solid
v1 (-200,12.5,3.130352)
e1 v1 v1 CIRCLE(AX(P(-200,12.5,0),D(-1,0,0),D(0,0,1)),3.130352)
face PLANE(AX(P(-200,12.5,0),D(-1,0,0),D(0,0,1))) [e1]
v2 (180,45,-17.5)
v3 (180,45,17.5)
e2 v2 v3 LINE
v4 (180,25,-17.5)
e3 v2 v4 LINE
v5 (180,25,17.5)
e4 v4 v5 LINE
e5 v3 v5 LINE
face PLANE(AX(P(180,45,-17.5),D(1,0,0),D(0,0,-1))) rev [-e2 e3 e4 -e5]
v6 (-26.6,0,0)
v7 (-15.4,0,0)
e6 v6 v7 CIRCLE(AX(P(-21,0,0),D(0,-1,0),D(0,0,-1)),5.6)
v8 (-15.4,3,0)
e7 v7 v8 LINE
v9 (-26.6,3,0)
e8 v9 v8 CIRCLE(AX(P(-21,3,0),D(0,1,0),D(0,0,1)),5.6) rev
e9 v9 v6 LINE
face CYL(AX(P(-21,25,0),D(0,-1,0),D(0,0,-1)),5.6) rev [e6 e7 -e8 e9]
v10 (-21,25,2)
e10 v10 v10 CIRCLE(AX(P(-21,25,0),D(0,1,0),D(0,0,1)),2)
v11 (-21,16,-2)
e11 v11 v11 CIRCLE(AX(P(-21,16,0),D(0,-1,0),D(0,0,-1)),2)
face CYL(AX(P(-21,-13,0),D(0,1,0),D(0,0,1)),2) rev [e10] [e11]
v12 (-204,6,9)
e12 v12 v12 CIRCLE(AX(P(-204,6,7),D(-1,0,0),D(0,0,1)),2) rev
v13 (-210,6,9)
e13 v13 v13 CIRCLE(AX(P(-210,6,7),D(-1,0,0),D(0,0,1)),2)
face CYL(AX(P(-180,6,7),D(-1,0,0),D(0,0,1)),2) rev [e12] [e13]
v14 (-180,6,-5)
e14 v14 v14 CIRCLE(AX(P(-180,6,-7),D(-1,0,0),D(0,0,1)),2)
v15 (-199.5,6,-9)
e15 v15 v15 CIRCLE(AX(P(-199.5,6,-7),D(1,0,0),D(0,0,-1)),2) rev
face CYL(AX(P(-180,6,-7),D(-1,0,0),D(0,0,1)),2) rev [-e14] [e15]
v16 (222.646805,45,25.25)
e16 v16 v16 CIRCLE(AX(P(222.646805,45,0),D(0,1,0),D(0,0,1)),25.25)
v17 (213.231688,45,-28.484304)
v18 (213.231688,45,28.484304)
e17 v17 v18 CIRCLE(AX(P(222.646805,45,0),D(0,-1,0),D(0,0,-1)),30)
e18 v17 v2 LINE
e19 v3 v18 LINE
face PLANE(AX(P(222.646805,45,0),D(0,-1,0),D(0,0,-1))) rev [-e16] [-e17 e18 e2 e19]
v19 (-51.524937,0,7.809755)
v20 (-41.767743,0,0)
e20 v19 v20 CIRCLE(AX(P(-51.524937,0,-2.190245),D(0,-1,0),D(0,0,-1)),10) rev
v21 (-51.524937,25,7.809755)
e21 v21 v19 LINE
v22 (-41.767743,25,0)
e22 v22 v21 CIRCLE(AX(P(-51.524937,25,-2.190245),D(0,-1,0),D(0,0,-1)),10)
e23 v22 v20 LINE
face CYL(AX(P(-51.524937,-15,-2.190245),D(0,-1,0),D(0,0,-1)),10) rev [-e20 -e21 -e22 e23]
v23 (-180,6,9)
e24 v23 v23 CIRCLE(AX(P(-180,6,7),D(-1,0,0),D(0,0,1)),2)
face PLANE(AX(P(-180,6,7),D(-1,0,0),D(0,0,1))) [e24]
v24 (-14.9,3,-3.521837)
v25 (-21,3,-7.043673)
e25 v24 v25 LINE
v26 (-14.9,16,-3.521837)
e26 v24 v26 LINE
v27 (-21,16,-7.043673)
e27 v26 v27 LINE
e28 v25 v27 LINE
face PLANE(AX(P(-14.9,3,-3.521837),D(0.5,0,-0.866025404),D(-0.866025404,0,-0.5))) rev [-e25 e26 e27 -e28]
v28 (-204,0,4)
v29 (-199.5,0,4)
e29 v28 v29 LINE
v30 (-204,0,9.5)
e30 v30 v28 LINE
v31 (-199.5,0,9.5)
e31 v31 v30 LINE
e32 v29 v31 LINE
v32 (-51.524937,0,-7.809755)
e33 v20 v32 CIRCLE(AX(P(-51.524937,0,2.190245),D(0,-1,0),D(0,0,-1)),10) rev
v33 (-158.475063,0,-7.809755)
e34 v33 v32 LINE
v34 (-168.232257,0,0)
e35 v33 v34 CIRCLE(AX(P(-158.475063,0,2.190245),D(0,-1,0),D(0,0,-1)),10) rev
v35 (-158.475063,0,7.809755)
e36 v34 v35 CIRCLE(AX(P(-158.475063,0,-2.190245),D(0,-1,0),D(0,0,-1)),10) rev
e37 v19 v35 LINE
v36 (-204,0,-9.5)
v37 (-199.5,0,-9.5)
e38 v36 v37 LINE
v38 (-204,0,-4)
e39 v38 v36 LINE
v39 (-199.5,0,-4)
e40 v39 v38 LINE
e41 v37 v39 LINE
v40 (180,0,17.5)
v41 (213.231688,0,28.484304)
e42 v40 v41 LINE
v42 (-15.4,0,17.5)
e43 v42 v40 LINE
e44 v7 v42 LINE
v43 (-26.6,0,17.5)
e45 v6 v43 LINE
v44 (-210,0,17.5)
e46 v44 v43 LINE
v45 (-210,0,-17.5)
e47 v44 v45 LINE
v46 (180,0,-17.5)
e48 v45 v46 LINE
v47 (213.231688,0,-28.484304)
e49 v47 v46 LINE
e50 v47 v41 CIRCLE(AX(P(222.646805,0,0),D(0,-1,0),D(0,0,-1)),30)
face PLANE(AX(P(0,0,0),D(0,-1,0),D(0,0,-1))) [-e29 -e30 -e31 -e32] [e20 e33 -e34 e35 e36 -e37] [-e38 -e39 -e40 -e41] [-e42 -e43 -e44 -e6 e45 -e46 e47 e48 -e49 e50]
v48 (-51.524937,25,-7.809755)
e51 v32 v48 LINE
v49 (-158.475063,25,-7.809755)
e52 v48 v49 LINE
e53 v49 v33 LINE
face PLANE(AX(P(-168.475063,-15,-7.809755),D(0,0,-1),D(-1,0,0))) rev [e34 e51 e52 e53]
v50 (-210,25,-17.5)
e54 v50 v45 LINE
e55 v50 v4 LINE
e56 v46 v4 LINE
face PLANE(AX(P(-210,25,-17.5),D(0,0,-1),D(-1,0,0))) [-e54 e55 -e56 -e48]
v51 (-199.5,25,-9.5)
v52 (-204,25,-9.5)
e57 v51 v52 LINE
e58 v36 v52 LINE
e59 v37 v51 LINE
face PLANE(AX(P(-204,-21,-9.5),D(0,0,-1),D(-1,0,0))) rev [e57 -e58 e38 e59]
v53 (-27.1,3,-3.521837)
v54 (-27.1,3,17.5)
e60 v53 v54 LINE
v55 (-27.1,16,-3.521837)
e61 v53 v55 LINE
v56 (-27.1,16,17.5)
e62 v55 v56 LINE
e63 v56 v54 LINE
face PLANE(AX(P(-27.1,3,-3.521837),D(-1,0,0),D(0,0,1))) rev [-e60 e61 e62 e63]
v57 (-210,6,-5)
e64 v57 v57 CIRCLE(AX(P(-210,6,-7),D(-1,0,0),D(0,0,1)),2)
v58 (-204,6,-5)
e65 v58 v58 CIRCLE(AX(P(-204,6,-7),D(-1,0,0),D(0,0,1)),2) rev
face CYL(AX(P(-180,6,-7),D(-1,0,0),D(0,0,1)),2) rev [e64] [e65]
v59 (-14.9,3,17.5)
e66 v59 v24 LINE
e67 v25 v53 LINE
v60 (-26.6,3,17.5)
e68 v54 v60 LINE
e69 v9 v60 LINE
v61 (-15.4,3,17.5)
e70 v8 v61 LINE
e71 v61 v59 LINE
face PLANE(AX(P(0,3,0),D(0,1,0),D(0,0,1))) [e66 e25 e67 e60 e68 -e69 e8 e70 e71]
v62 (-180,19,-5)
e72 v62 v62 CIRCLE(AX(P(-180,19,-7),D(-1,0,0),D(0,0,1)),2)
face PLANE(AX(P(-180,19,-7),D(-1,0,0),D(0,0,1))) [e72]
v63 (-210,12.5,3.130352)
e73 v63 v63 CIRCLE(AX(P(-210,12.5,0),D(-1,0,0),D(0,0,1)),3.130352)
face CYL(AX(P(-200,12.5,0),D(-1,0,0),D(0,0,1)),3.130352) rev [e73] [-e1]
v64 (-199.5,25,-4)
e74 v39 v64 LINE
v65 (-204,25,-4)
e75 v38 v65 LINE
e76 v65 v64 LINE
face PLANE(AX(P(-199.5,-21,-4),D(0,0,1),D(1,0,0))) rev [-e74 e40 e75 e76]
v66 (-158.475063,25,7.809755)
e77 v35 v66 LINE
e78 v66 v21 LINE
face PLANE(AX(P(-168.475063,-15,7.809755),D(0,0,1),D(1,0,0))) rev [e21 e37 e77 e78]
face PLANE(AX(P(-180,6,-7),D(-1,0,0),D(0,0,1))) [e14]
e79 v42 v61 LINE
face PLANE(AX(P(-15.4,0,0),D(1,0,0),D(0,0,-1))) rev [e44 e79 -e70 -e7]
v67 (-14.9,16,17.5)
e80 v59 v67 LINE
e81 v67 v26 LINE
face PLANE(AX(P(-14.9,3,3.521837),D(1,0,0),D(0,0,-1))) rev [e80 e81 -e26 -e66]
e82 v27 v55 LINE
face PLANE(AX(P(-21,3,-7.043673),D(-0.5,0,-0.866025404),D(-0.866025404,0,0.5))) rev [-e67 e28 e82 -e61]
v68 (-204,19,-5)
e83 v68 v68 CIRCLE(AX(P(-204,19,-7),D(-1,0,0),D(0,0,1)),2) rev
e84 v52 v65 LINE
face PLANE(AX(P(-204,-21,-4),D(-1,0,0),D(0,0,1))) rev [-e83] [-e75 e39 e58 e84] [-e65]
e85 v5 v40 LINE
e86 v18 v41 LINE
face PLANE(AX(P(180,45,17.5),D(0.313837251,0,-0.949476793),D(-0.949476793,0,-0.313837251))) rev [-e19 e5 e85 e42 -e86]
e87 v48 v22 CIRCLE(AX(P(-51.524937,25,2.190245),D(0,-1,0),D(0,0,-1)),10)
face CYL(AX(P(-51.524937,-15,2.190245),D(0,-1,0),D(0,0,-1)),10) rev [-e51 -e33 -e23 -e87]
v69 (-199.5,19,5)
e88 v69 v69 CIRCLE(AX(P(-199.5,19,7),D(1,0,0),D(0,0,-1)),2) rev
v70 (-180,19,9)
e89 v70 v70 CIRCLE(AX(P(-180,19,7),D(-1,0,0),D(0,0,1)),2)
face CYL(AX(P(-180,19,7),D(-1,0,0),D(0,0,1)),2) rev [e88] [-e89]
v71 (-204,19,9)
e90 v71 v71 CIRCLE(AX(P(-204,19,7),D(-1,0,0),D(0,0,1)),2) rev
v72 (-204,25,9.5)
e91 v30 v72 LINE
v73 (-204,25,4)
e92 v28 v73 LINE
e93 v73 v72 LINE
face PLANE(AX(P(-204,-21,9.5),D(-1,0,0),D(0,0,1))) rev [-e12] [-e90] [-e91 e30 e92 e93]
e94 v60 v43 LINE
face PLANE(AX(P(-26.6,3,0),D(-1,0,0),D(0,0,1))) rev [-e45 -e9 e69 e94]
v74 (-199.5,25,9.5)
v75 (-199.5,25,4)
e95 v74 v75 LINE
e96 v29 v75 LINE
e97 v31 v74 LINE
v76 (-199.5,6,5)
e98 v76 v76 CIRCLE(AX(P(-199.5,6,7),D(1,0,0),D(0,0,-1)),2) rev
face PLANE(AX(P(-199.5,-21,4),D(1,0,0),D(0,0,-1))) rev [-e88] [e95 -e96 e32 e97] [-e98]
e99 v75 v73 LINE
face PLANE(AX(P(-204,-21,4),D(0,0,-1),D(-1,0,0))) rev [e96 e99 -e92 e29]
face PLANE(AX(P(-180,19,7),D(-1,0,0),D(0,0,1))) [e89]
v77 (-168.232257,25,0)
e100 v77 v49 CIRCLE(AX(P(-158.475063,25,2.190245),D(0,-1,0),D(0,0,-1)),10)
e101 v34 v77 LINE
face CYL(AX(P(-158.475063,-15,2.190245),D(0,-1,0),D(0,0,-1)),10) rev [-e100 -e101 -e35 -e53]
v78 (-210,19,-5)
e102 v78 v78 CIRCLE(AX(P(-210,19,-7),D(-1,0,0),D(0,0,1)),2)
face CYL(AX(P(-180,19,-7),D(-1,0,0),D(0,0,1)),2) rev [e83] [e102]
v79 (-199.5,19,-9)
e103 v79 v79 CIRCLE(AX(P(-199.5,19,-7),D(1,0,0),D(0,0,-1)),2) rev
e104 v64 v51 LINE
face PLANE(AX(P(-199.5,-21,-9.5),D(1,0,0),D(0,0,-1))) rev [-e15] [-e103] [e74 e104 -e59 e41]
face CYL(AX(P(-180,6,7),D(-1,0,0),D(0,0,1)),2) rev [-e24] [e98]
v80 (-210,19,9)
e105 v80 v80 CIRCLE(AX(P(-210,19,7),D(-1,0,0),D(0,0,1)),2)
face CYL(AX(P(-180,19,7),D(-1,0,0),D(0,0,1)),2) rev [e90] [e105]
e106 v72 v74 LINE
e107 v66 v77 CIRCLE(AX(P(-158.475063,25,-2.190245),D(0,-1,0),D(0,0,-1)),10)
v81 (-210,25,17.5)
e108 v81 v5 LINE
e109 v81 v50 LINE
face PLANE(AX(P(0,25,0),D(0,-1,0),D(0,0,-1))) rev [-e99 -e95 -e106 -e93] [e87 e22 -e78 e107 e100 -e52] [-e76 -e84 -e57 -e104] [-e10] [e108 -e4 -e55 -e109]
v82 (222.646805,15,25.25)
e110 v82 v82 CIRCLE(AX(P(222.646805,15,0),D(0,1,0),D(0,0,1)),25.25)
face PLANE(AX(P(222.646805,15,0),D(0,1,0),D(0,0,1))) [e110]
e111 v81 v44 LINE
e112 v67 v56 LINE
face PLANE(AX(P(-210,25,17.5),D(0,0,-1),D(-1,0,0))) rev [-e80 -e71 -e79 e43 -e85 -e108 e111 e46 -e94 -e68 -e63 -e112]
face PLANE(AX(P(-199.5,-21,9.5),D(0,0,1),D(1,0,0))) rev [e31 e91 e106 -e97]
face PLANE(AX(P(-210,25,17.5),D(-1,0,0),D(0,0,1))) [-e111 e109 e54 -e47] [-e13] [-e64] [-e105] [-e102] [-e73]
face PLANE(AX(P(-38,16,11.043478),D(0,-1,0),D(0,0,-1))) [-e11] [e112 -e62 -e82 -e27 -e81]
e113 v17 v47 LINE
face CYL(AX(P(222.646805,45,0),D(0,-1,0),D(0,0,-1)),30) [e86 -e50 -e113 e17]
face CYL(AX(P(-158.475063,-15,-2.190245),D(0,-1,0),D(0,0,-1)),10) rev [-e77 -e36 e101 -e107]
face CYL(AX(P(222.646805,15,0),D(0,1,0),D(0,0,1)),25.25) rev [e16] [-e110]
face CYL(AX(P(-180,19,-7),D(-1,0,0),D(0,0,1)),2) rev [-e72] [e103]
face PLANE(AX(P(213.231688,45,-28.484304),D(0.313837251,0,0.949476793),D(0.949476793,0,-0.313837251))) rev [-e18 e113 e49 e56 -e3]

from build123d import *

# Parameters (mm, degrees)
SKETCH2_W                = 210
SKETCH2_H                = 35
BOSS_EXTRUDE1_DEPTH      = 25
SKETCH3_R                = 5.6
CUT_EXTRUDE1_DEPTH       = 213.205678529
CUT_EXTRUDE2_DEPTH       = 22
SKETCH6_W                = 22.496439662
SKETCH6_H                = 9
BOSS_EXTRUDE3_DEPTH      = 38
CUT_EXTRUDE4_DEPTH       = 17.5
SKETCH9_R                = 2
CUT_EXTRUDE5_DEPTH       = 38
SKETCH10_R               = 2
CUT_EXTRUDE6_DEPTH       = 30
SKETCH12_W               = 4.5
SKETCH12_H               = 5.5
CUT_EXTRUDE7_DEPTH       = 46
SKETCH14_W               = 126.950126738
SKETCH14_H               = 15.619509634
CUT_EXTRUDE8_DEPTH       = 40
FILLET1_R                = 10
SKETCH17_W               = 35
SKETCH17_H               = 25
BOSS_EXTRUDE5_DEPTH      = 180
BOSS_EXTRUDE4_DEPTH      = 20
BOSS_EXTRUDE4_DEPTH_BACK = 25
SKETCH18_R               = 3.130352174
CUT_EXTRUDE9_DEPTH       = 10
SKETCH20_R               = 25.25
CUT_EXTRUDE11_DEPTH      = 30


with BuildPart() as part:
    # Sketch2 → Boss-Extrude1 (new body)
    with BuildSketch(Plane(origin=(0, 0, 0), x_dir=(1, 0, 0), z_dir=(0, 1, 0))):
        with Locations((-105, 0)):
            Rectangle(SKETCH2_W, SKETCH2_H)
    extrude(amount=BOSS_EXTRUDE1_DEPTH)

    # Sketch3 → Cut-Extrude1 (cut, through all)
    with BuildSketch(Plane.XZ):
        with Locations(Location((-21, 0, 0), (0, 0, 270))):
            Circle(SKETCH3_R)
    extrude(amount=-CUT_EXTRUDE1_DEPTH, mode=Mode.SUBTRACT)

    # Sketch4 → Cut-Extrude2 (cut)
    with BuildSketch(Plane(origin=(0, 25, 0), x_dir=(1, 0, 0), z_dir=(0, 1, 0))):
        Polygon((-14.9, 3.521836642), (-21, 7.043673284), (-27.1, 3.521836642), (-27.1, -3.521836642), (-21, -7.043673284), (-14.9, -3.521836642), align=None)
    extrude(amount=-CUT_EXTRUDE2_DEPTH, mode=Mode.SUBTRACT)

    # Sketch6 → Boss-Extrude3 (add)
    with BuildSketch(Plane(origin=(0, 0, 0), x_dir=(0, 0, -1), z_dir=(1, 0, 0))):
        with Locations((0.204742288, 20.5)):
            Rectangle(SKETCH6_W, SKETCH6_H)
    extrude(amount=-BOSS_EXTRUDE3_DEPTH)

    # Sketch7 → Cut-Extrude4 (cut)
    with BuildSketch(Plane.XY.offset(17.5)):
        Polygon((-21, 16), (-14.9, 16), (-14.9, 3), (-15.4, 3), (-15.4, 0), (-26.6, 0), (-26.6, 3), (-27.1, 3), (-27.1, 16), align=None)
    extrude(amount=-CUT_EXTRUDE4_DEPTH, mode=Mode.SUBTRACT)

    # Sketch9 → Cut-Extrude5 (cut)
    with BuildSketch(Plane(origin=(0, 25, 0), x_dir=(1, 0, 0), z_dir=(0, 1, 0))):
        with Locations(Location((-21, 0, 0), (0, 0, 270))):
            Circle(SKETCH9_R)
    extrude(amount=-CUT_EXTRUDE5_DEPTH, mode=Mode.SUBTRACT)

    # Sketch10 → Cut-Extrude6 (cut)
    with BuildSketch(Plane.ZY.offset(210)):
        with Locations((7, 19)):
            Circle(SKETCH10_R)
        with Locations((7, 6)):
            Circle(SKETCH10_R)
        with Locations((-7, 6)):
            Circle(SKETCH10_R)
        with Locations((-7, 19)):
            Circle(SKETCH10_R)
    extrude(amount=-CUT_EXTRUDE6_DEPTH, mode=Mode.SUBTRACT)

    # Sketch12 → Cut-Extrude7 (cut)
    with BuildSketch(Plane(origin=(0, 25, 0), x_dir=(1, 0, 0), z_dir=(0, 1, 0))):
        with Locations((-201.75, -6.75)):
            Rectangle(SKETCH12_W, SKETCH12_H)
        with Locations((-201.75, 6.75)):
            Rectangle(SKETCH12_W, SKETCH12_H)
    extrude(amount=-CUT_EXTRUDE7_DEPTH, mode=Mode.SUBTRACT)

    # Sketch14 → Cut-Extrude8 (cut)
    with BuildSketch(Plane(origin=(0, 25, 0), x_dir=(1, 0, 0), z_dir=(0, 1, 0))):
        with Locations((-105, 0)):
            Rectangle(SKETCH14_W, SKETCH14_H)
    extrude(amount=-CUT_EXTRUDE8_DEPTH, mode=Mode.SUBTRACT)

    # Fillet1
    # the kernel refuses this fillet: 10 mm, written as the material it adds along each edge
    with BuildSketch(Plane(origin=(-168.475063369, 25, 7.809754817), x_dir=(0, 0, -1), z_dir=(0, -1, 0)), Plane(origin=(-41.524936631, 25, 7.809754817), x_dir=(-1, 0, 0), z_dir=(0, -1, 0)), Plane(origin=(-41.524936631, 25, -7.809754817), x_dir=(0, 0, 1), z_dir=(0, -1, 0))) as fillet1_piece_1:
        with BuildLine():
            CenterArc((FILLET1_R, FILLET1_R), FILLET1_R, 180, 90)
            Line((0, FILLET1_R), (0, 0))
            Line((0, 0), (FILLET1_R, 0))
        make_face()
    extrude(amount=25)
    with BuildSketch(Plane(origin=(-168.475063369, 25, -7.809754817), x_dir=(0, 0, 1), z_dir=(0, -1, 0))) as fillet1_piece_2:
        with BuildLine():
            CenterArc((FILLET1_R, -FILLET1_R), FILLET1_R, 90, 90)
            Line((0, -FILLET1_R), (0, 0))
            Line((0, 0), (FILLET1_R, 0))
        make_face()
    extrude(amount=25)

    # Sketch17 → Boss-Extrude5 (add)
    with BuildSketch(Plane(origin=(0, 0, 0), x_dir=(0, 0, -1), z_dir=(1, 0, 0))):
        with Locations((0, 12.5)):
            Rectangle(SKETCH17_W, SKETCH17_H)
    extrude(amount=BOSS_EXTRUDE5_DEPTH)

    # Sketch16 → Boss-Extrude4 (add, two sides: drawn at the far end of the back side and taken through both)
    with BuildSketch(Plane(origin=(0, 25, 0), x_dir=(1, 0, 0), z_dir=(0, 1, 0)).offset(-BOSS_EXTRUDE4_DEPTH_BACK)):
        with BuildLine():
            Line((213.231687746, 28.484303782), (180, 17.5))
            Line((180, 17.5), (180, -17.5))
            Line((180, -17.5), (213.231687746, -28.484303782))
            ThreePointArc((213.231687746, -28.484303782), (252.646805273, 0), (213.231687746, 28.484303782))
        make_face()
    extrude(amount=BOSS_EXTRUDE4_DEPTH + BOSS_EXTRUDE4_DEPTH_BACK)

    # Sketch18 → Cut-Extrude9 (cut)
    with BuildSketch(Plane.ZY.offset(210)):
        with Locations((0, 12.5)):
            Circle(SKETCH18_R)
    extrude(amount=-CUT_EXTRUDE9_DEPTH, mode=Mode.SUBTRACT)

    # Sketch20 → Cut-Extrude11 (cut)
    with BuildSketch(Plane(origin=(0, 45, 0), x_dir=(1, 0, 0), z_dir=(0, 1, 0))):
        with Locations(Location((222.646805273, 0, 0), (0, 0, 270))):
            Circle(SKETCH20_R)
    extrude(amount=-CUT_EXTRUDE11_DEPTH, mode=Mode.SUBTRACT)


solid = part.part
